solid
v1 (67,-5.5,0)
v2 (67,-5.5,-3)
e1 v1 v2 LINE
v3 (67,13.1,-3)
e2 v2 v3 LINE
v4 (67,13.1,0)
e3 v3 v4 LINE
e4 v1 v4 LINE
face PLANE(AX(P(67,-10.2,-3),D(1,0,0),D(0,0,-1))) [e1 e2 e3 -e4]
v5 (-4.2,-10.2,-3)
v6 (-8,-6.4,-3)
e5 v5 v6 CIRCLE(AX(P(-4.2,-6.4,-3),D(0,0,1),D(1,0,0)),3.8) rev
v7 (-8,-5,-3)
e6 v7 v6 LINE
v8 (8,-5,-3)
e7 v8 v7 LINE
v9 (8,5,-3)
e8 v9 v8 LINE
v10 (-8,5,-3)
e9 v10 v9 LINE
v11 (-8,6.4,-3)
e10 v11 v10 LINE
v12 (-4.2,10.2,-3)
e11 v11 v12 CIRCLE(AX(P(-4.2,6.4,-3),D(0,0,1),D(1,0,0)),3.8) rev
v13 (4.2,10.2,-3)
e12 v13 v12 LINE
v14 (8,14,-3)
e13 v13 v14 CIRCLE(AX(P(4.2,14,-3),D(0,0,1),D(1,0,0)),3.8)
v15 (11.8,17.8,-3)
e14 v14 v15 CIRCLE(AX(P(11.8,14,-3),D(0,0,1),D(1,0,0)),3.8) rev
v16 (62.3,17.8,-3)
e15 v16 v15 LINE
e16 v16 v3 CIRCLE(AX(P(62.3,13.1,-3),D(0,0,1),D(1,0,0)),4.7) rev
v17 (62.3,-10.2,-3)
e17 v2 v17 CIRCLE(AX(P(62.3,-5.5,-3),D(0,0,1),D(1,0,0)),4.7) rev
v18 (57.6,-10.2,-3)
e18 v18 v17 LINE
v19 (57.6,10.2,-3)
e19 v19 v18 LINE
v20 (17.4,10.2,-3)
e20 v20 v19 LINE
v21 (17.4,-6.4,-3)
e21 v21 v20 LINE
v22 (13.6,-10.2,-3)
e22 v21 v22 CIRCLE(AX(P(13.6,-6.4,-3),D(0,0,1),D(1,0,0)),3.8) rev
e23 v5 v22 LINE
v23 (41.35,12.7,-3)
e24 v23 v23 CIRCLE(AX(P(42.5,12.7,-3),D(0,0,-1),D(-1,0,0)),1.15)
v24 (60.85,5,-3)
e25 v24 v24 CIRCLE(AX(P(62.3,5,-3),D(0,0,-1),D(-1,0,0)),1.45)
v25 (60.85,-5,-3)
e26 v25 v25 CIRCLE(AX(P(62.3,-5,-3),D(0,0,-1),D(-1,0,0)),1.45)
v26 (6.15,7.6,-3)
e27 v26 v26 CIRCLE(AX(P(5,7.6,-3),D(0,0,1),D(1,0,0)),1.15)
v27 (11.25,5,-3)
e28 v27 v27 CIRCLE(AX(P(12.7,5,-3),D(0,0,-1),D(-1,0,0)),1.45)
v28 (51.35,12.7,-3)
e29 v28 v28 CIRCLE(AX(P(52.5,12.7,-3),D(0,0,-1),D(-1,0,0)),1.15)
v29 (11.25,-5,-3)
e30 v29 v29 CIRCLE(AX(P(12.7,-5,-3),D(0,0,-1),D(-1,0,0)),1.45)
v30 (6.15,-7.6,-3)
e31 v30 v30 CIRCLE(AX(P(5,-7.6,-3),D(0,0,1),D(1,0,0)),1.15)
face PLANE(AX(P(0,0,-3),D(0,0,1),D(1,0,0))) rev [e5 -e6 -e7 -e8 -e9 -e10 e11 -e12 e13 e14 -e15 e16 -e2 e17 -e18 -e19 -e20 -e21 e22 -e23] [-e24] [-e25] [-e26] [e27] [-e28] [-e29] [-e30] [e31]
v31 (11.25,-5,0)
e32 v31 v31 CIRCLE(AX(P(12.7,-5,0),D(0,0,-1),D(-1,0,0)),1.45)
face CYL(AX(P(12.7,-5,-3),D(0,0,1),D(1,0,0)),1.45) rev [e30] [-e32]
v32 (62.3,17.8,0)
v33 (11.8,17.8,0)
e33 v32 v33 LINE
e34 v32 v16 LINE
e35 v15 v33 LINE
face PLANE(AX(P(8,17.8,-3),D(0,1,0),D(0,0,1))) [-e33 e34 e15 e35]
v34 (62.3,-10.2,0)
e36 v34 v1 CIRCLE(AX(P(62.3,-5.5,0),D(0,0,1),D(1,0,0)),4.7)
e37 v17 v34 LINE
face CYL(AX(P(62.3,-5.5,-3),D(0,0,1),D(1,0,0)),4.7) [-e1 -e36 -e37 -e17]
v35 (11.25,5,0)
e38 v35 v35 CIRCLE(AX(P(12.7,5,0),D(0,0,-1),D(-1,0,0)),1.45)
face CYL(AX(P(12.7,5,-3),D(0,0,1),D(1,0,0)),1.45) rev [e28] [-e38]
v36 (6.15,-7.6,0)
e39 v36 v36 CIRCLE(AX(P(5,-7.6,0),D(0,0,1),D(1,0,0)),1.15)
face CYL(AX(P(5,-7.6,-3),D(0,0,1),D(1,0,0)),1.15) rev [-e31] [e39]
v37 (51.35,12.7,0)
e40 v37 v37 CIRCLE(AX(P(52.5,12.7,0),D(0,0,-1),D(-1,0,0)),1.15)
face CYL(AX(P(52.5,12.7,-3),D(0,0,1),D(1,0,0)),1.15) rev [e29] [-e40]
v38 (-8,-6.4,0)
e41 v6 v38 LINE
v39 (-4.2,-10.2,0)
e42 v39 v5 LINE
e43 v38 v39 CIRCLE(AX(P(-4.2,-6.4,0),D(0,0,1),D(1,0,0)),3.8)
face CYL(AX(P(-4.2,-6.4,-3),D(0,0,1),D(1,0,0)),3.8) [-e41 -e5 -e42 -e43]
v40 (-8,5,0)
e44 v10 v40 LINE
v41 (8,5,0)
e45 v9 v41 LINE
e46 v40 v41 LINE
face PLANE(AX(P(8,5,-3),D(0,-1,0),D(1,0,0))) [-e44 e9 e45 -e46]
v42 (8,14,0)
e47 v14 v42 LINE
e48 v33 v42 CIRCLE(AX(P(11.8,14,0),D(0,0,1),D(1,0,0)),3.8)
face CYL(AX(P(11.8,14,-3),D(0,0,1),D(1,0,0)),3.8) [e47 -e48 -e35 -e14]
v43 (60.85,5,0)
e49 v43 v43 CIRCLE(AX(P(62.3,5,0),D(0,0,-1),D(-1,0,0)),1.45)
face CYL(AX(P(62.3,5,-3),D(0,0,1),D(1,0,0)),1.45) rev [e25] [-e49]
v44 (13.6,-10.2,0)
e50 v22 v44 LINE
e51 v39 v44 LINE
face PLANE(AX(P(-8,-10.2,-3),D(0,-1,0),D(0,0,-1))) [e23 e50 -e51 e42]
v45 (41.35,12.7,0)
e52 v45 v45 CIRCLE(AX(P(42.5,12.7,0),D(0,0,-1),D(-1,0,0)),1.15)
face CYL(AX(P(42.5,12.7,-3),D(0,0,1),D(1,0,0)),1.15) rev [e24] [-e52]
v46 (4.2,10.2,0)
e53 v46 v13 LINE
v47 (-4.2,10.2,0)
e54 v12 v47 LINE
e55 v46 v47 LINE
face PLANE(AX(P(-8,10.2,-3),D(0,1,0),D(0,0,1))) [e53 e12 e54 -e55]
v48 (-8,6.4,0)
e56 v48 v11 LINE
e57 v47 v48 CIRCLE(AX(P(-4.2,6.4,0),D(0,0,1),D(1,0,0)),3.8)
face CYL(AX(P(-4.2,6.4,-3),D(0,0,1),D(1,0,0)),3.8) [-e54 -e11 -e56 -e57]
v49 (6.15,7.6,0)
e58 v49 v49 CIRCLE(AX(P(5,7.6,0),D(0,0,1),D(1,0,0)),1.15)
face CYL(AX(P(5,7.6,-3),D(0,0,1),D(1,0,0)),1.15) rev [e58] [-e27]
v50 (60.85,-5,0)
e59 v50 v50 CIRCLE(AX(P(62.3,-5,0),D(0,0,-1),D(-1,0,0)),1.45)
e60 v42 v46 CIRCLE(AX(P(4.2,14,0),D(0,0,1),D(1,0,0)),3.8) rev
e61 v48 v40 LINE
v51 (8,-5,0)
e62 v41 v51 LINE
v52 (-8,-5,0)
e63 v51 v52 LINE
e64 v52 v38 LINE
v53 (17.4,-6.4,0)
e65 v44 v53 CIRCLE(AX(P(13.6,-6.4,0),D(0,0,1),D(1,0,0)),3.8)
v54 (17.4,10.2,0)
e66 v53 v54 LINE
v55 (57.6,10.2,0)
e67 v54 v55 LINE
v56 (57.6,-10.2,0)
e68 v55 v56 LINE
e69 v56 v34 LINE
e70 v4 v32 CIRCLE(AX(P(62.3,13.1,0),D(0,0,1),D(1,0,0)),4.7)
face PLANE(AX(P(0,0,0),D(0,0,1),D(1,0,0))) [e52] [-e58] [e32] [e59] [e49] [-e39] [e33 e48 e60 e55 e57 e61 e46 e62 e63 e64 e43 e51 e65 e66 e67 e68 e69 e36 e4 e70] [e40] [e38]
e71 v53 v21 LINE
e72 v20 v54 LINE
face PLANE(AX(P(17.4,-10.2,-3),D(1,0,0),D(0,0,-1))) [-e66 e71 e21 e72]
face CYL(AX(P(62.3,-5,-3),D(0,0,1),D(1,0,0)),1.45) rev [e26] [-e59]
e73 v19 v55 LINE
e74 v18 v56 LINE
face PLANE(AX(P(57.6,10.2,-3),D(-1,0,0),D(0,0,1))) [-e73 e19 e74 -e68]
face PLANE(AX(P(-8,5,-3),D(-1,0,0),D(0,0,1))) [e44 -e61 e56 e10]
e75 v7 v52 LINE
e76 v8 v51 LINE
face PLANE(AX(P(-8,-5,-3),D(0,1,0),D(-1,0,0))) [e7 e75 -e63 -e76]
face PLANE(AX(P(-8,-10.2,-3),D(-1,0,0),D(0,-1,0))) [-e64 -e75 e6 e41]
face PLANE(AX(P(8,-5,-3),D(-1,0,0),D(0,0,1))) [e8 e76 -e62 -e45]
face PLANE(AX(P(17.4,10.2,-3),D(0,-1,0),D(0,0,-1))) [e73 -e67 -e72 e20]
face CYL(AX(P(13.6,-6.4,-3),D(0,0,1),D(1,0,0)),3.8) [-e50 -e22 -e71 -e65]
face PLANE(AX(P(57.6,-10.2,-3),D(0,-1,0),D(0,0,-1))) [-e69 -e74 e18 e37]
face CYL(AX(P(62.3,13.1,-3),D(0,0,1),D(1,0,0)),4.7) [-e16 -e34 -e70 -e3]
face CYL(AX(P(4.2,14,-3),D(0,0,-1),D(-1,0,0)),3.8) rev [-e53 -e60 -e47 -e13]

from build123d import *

# Parameters (mm, degrees)
BOSS_EXTRUDE7_DEPTH = 3
SKETCH12_R          = 1.15
CUT_EXTRUDE3_DEPTH  = 70.389048127
SKETCH11_R          = 1.45
CUT_EXTRUDE4_DEPTH  = 70.389048127
SKETCH13_R          = 1.15
CUT_EXTRUDE5_DEPTH  = 70.389048127
FILLET1_R           = 4.7
FILLET2_R           = 3.8


with BuildPart() as part:
    # Sketch10 → Boss-Extrude7 (new body)
    with BuildSketch(Plane.XY):
        Polygon((17.4, 10.2), (57.6, 10.2), (57.6, -10.2), (67, -10.2), (67, 17.8), (8, 17.8), (8, 10.2), (-8, 10.2), (-8, 5), (8, 5), (8, -5), (-8, -5), (-8, -10.2), (17.4, -10.2), align=None)
    extrude(amount=-BOSS_EXTRUDE7_DEPTH)

    # Sketch12 → Cut-Extrude3 (cut, through all)
    with BuildSketch(Plane(origin=(0, 0, 0), x_dir=(-1, 0, 0), z_dir=(0, 0, -1))):
        with Locations((-52.5, 12.7)):
            Circle(SKETCH12_R)
        with Locations((-42.5, 12.7)):
            Circle(SKETCH12_R)
    extrude(amount=CUT_EXTRUDE3_DEPTH, mode=Mode.SUBTRACT)

    # Sketch11 → Cut-Extrude4 (cut, through all)
    with BuildSketch(Plane(origin=(0, 0, 0), x_dir=(-1, 0, 0), z_dir=(0, 0, -1))):
        with Locations((-62.3, -5)):
            Circle(SKETCH11_R)
        with Locations((-12.7, -5)):
            Circle(SKETCH11_R)
        with Locations((-12.7, 5)):
            Circle(SKETCH11_R)
        with Locations((-62.3, 5)):
            Circle(SKETCH11_R)
    extrude(amount=CUT_EXTRUDE4_DEPTH, mode=Mode.SUBTRACT)

    # Sketch13 → Cut-Extrude5 (cut, through all)
    with BuildSketch(Plane.XY):
        with Locations((5, 7.6)):
            Circle(SKETCH13_R)
        with Locations((5, -7.6)):
            Circle(SKETCH13_R)
    extrude(amount=-CUT_EXTRUDE5_DEPTH, mode=Mode.SUBTRACT)

    # Fillet1
    fillet1_edges = [part.edges().sort_by_distance(p)[0] for p in [
        (67, 17.8, -1.5),
        (67, -10.2, -1.5),
    ]]
    fillet(fillet1_edges, radius=FILLET1_R)

    # Fillet2
    fillet2_edges = [part.edges().sort_by_distance(p)[0] for p in [
        (17.4, -10.2, -1.5),
        (-8, -10.2, -1.5),
        (8, 17.8, -1.5),
        (8, 10.2, -1.5),
        (-8, 10.2, -1.5),
    ]]
    fillet(fillet2_edges, radius=FILLET2_R - 0.0001)  # a hair under: the kernel refuses the full size


solid = part.part
